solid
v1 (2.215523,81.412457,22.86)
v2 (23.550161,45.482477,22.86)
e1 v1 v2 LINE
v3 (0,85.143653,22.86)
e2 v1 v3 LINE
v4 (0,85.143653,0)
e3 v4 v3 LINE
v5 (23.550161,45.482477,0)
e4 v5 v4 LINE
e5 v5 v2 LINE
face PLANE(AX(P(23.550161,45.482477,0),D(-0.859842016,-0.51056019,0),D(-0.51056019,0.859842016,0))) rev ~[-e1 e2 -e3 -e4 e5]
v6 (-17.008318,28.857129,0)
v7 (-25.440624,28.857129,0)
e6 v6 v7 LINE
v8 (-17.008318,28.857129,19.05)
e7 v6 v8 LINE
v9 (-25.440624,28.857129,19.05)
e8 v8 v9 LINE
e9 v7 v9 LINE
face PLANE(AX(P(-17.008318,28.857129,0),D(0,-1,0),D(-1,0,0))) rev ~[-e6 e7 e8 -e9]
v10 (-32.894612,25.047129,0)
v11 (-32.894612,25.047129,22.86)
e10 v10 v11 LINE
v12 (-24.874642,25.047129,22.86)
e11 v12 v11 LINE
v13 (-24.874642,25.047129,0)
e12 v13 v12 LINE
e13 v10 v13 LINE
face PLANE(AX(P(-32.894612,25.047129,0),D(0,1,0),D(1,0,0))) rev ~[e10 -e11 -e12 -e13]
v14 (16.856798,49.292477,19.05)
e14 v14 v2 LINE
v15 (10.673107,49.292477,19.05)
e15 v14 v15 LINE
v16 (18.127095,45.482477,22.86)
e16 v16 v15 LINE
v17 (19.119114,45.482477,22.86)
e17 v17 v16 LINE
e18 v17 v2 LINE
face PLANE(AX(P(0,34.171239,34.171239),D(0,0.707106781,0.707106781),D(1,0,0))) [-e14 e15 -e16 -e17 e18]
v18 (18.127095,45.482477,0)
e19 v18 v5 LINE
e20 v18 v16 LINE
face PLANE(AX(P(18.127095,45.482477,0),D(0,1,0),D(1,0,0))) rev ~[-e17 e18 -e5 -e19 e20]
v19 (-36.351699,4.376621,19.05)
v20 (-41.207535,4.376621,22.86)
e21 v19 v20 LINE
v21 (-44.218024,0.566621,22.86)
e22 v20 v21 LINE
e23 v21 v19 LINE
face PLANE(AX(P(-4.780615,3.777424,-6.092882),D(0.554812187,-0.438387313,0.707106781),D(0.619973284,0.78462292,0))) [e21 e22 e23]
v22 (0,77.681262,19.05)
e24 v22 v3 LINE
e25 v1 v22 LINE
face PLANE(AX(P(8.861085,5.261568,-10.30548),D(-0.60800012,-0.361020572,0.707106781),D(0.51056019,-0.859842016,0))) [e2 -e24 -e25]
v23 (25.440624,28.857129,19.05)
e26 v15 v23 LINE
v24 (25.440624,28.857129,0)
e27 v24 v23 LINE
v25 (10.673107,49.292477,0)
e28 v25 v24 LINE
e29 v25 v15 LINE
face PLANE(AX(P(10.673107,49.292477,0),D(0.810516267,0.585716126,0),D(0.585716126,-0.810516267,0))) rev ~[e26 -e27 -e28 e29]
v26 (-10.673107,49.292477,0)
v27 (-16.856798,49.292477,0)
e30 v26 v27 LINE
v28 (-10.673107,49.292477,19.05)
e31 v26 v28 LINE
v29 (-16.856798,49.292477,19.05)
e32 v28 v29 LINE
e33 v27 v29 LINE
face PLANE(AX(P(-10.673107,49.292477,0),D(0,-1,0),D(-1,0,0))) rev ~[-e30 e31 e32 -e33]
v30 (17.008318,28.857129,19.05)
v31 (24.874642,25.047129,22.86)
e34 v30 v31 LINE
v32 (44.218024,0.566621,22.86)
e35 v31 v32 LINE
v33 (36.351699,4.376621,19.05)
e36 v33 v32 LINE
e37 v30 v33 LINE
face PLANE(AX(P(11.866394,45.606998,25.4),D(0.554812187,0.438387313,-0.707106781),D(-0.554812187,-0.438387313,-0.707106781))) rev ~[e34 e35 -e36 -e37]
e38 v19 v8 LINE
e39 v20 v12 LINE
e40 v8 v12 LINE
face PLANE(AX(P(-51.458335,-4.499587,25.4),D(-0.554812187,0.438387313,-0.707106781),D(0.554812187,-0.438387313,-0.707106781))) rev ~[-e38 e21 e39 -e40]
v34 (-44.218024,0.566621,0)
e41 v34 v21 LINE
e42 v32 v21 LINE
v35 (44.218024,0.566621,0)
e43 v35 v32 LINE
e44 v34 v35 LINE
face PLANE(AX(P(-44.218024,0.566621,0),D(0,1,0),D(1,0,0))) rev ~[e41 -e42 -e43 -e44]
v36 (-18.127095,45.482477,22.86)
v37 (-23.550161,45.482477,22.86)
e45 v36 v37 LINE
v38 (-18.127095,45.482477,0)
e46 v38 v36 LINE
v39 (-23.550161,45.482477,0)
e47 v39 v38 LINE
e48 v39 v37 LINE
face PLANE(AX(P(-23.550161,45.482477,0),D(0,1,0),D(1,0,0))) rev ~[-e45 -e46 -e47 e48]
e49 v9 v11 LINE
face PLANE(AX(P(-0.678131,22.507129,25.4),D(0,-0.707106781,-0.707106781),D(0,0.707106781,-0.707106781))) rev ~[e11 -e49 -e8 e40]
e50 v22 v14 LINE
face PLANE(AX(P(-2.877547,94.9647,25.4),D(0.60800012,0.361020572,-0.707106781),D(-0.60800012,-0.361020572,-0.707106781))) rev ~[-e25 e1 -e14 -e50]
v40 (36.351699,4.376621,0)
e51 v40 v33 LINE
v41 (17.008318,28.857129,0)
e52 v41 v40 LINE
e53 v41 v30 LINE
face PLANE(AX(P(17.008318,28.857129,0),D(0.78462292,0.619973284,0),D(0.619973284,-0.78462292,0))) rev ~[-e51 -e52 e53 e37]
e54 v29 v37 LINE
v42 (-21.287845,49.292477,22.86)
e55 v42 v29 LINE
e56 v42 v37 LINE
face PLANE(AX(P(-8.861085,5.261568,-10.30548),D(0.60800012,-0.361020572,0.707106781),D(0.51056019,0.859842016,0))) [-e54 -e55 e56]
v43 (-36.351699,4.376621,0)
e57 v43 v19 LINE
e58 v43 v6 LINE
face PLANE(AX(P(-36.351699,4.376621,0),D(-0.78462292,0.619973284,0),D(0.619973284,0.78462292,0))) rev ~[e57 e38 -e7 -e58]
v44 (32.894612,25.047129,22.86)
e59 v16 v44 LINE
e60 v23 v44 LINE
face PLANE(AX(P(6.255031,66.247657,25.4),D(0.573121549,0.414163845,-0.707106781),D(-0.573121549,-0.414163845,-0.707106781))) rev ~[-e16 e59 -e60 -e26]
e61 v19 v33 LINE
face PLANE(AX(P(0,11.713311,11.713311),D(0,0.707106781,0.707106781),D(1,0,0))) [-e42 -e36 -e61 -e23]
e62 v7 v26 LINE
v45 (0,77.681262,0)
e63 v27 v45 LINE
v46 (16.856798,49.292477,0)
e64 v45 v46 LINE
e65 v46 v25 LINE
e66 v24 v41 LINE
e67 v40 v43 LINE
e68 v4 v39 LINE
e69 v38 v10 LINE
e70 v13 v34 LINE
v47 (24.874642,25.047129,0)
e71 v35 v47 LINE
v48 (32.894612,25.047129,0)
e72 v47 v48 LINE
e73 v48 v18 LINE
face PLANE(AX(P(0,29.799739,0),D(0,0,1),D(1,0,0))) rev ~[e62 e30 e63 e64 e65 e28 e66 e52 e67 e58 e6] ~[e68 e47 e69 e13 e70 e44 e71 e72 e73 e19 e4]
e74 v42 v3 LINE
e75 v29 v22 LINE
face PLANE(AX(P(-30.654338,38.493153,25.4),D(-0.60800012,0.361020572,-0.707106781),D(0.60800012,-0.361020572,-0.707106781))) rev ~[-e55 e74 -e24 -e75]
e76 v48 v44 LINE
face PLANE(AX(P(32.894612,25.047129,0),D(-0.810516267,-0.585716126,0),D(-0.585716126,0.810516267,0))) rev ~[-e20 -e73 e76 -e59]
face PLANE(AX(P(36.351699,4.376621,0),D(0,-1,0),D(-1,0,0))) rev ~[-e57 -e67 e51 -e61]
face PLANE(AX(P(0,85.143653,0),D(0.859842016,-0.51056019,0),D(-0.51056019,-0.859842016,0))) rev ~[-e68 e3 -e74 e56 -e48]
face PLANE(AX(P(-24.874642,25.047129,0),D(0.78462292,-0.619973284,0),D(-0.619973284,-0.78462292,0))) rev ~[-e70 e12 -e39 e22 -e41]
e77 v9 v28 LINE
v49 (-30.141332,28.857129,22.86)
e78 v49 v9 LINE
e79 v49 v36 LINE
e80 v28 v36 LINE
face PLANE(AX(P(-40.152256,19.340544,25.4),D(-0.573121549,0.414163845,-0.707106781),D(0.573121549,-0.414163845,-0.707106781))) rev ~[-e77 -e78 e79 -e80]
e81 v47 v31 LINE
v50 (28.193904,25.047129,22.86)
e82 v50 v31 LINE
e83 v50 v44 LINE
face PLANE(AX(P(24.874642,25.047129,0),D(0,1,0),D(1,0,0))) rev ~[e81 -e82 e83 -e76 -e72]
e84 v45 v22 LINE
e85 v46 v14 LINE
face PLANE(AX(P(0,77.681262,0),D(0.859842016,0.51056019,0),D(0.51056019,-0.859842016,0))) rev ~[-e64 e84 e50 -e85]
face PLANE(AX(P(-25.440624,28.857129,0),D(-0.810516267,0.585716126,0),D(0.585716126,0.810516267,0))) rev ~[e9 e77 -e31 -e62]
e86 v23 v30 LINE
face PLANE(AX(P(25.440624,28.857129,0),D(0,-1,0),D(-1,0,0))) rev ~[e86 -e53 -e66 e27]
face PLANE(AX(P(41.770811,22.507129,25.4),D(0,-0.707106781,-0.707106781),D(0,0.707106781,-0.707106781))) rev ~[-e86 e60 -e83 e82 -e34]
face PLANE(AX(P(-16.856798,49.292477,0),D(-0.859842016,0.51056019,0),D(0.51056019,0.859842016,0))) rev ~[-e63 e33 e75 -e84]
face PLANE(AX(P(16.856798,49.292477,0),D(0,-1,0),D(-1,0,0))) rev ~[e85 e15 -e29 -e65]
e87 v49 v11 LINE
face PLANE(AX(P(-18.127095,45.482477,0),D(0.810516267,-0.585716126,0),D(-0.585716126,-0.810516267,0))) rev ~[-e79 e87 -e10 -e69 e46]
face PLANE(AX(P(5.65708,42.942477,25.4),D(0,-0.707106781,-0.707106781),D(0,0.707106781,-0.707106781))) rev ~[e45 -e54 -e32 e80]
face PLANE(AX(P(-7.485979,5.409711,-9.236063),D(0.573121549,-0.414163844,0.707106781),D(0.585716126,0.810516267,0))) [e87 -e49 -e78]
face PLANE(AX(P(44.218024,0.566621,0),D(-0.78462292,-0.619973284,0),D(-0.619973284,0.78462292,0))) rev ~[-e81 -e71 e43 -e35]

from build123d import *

# Parameters (mm, degrees)
F1_DEPTH     = 25.4
F2_T4_DEPTH  = 57.8731292872
F2_T9_DEPTH  = 41.0926802964
F2_T14_DEPTH = 63.860720941
F2_T19_DEPTH = 105.3637727113
F2_T25_DEPTH = 63.860720941
F2_T30_DEPTH = 41.0926802964
F2_T35_DEPTH = 57.8731292872
F2_T40_DEPTH = 38.84406527
F2_T45_DEPTH = 65.6766537471
F2_T51_DEPTH = 65.6766537471
F2_T57_DEPTH = 38.84406527


# Not quite as in the source:
# - a fillet or chamfer that OpenCascade refuses, or shapes differently, is made with other operations: its cross-section is extruded or revolved along the edge and cut away or added


with BuildPart() as f1:
    # F0 (on Top) → F1 (new body)
    with BuildSketch(Plane.XY):
        Polygon((-44.2180235174, 0.5666213692), (0, 0.5666213692), (44.2180235174, 0.5666213692), (24.8746419192, 25.0471287349), (32.8946120205, 25.0471287349), (18.1270946377, 45.4824770849), (23.5501605907, 45.4824770849), (0, 85.1436531389), (-23.5501605907, 45.4824770849), (-18.1270946377, 45.4824770849), (-32.8946120205, 25.0471287349), (-24.8746419192, 25.0471287349), align=None)
        Polygon((36.3516993821, 4.3766213692), (0, 4.3766213692), (-36.3516993821, 4.3766213692), (-17.0083177839, 28.8571287349), (-25.4406241332, 28.8571287349), (-10.6731067504, 49.2924770849), (-16.8567980732, 49.2924770849), (0, 77.6812616757), (16.8567980732, 49.2924770849), (10.6731067504, 49.2924770849), (25.4406241332, 28.8571287349), (17.0083177839, 28.8571287349), align=None, mode=Mode.SUBTRACT)
    extrude(amount=F1_DEPTH)

    # F2: chamfer of 6.35 on 11 edges, made by hand


with BuildPart() as f2_tool2:
    # F2_s3 → F2_t4 (new body)
    with BuildSketch(Plane(origin=(-29.3040400955, 40.5510453716, 0), x_dir=(0, 0, 1), z_dir=(0.585716126, -0.8105162674, 0))):
        Polygon((25.4, -43.8721253629), (19.05, -37.5221253629), (25.4, -37.5221253629), align=None)
    extrude(amount=F2_T4_DEPTH)

    split(bisect_by=Plane(origin=(0, 23.9535643674, 23.9535643674), x_dir=(1, 0, 0), z_dir=(0, 0.7071067812, 0.7071067812)), keep=Keep.TOP)


with BuildPart() as f1_1:
    add(f1.part)

    # F2_t1: cut F2_tool2
    add(f2_tool2.part, mode=Mode.SUBTRACT)


with BuildPart() as f2_tool7:
    # F2_s8 → F2_t9 (new body)
    with BuildSketch(Plane.YZ.offset(41.7708111067)):
        Polygon((22.5071287349, 25.4), (28.8571287349, 19.05), (28.8571287349, 25.4), align=None)
    extrude(amount=-F2_T9_DEPTH)

    split(bisect_by=Plane(origin=(7.4859790504, 5.409710853, -9.2360626814), x_dir=(0.585716126, -0.8105162674, 0), z_dir=(-0.573121549, -0.4141638445, 0.7071067812)), keep=Keep.TOP)


with BuildPart() as f1_2:
    add(f1_1.part)

    # F2_t6: cut F2_tool7
    add(f2_tool7.part, mode=Mode.SUBTRACT)


with BuildPart() as f2_tool12:
    # F2_s13 → F2_t14 (new body)
    with BuildSketch(Plane(origin=(-17.6242588903, 22.3048280047, 0), x_dir=(0, 0, 1), z_dir=(0.6199732843, -0.7846229201, 0))):
        Polygon((25.4, -37.5857648435), (19.05, -31.2357648435), (25.4, -31.2357648435), align=None)
    extrude(amount=F2_T14_DEPTH)

    split(bisect_by=Plane(origin=(0, 11.7133106846, 11.7133106846), x_dir=(1, 0, 0), z_dir=(0, 0.7071067812, 0.7071067812)), keep=Keep.TOP)


with BuildPart() as f1_3:
    add(f1_2.part)

    # F2_t11: cut F2_tool12
    add(f2_tool12.part, mode=Mode.SUBTRACT)


with BuildPart() as f2_tool17:
    # F2_s18 → F2_t19 (new body)
    with BuildSketch(Plane.YZ.offset(-52.6818863557)):
        Polygon((-1.9733786308, 25.4), (4.3766213692, 19.05), (4.3766213692, 25.4), align=None)
    extrude(amount=F2_T19_DEPTH)

    split(bisect_by=Plane(origin=(4.7806151974, 3.7774243261, -6.0928824217), x_dir=(0.6199732843, -0.7846229201, 0), z_dir=(-0.5548121875, -0.4383873135, 0.7071067812)), keep=Keep.TOP)

    split(bisect_by=Plane(origin=(-4.7806151974, 3.7774243261, -6.0928824217), x_dir=(0.6199732843, 0.7846229201, 0), z_dir=(0.5548121875, -0.4383873135, 0.7071067812)), keep=Keep.TOP)


with BuildPart() as f1_4:
    add(f1_3.part)

    # F2_t16: cut F2_tool17
    add(f2_tool17.part, mode=Mode.SUBTRACT)


with BuildPart() as f2_tool23:
    # F2_s24 → F2_t25 (new body)
    with BuildSketch(Plane(origin=(-21.9676820116, -27.8017573382, 0), x_dir=(0, 0, 1), z_dir=(0.6199732843, 0.7846229201, 0))):
        Polygon((25.4, -37.5857648435), (19.05, -31.2357648435), (25.4, -31.2357648435), align=None)
    extrude(amount=F2_T25_DEPTH)

    split(bisect_by=Plane(origin=(0, 11.7133106846, 11.7133106846), x_dir=(1, 0, 0), z_dir=(0, 0.7071067812, 0.7071067812)), keep=Keep.TOP)


with BuildPart() as f1_5:
    add(f1_4.part)

    # F2_t22: cut F2_tool23
    add(f2_tool23.part, mode=Mode.SUBTRACT)


with BuildPart() as f2_tool28:
    # F2_s29 → F2_t30 (new body)
    with BuildSketch(Plane.YZ.offset(-0.6781308103)):
        Polygon((22.5071287349, 25.4), (28.8571287349, 19.05), (28.8571287349, 25.4), align=None)
    extrude(amount=-F2_T30_DEPTH)

    split(bisect_by=Plane(origin=(-7.4859790504, 5.409710853, -9.2360626814), x_dir=(0.585716126, 0.8105162674, 0), z_dir=(0.573121549, -0.4141638445, 0.7071067812)), keep=Keep.TOP)


with BuildPart() as f1_6:
    add(f1_5.part)

    # F2_t27: cut F2_tool28
    add(f2_tool28.part, mode=Mode.SUBTRACT)


with BuildPart() as f2_tool33:
    # F2_s34 → F2_t35 (new body)
    with BuildSketch(Plane(origin=(-4.5931849883, -6.3560673631, 0), x_dir=(0, 0, 1), z_dir=(0.585716126, 0.8105162674, 0))):
        Polygon((25.4, -43.8721253629), (19.05, -37.5221253629), (25.4, -37.5221253629), align=None)
    extrude(amount=F2_T35_DEPTH)

    split(bisect_by=Plane(origin=(0, 23.9535643674, 23.9535643674), x_dir=(1, 0, 0), z_dir=(0, 0.7071067812, 0.7071067812)), keep=Keep.TOP)


with BuildPart() as f1_7:
    add(f1_6.part)

    # F2_t32: cut F2_tool33
    add(f2_tool33.part, mode=Mode.SUBTRACT)


with BuildPart() as f2_tool38:
    # F2_s39 → F2_t40 (new body)
    with BuildSketch(Plane.YZ.offset(5.6570802232)):
        Polygon((42.9424770849, 25.4), (49.2924770849, 19.05), (49.2924770849, 25.4), align=None)
    extrude(amount=-F2_T40_DEPTH)

    split(bisect_by=Plane(origin=(-8.8610845664, 5.2615677423, -10.3054798432), x_dir=(0.5105601896, 0.8598420162, 0), z_dir=(0.6080001204, -0.3610205722, 0.7071067812)), keep=Keep.TOP)


with BuildPart() as f1_8:
    add(f1_7.part)

    # F2_t37: cut F2_tool38
    add(f2_tool38.part, mode=Mode.SUBTRACT)


with BuildPart() as f2_tool43:
    # F2_s44 → F2_t45 (new body)
    with BuildSketch(Plane(origin=(8.9078181115, 15.0017890968, 0), x_dir=(0, 0, 1), z_dir=(0.5105601896, 0.8598420162, 0))):
        Polygon((25.4, -46.0109596864), (19.05, -39.6609596864), (25.4, -39.6609596864), align=None)
    extrude(amount=F2_T45_DEPTH)

    split(bisect_by=Plane(origin=(0, 34.1712385424, 34.1712385424), x_dir=(1, 0, 0), z_dir=(0, 0.7071067812, 0.7071067812)), keep=Keep.TOP)

    split(bisect_by=Plane(origin=(8.8610845664, 5.2615677423, -10.3054798432), x_dir=(0.5105601896, -0.8598420162, 0), z_dir=(-0.6080001204, -0.3610205722, 0.7071067812)), keep=Keep.TOP)


with BuildPart() as f1_9:
    add(f1_8.part)

    # F2_t42: cut F2_tool43
    add(f2_tool43.part, mode=Mode.SUBTRACT)


with BuildPart() as f2_tool49:
    # F2_s50 → F2_t51 (new body)
    with BuildSketch(Plane(origin=(-42.4397028983, 71.4733354725, 0), x_dir=(0, 0, 1), z_dir=(0.5105601896, -0.8598420162, 0))):
        Polygon((25.4, -46.0109596864), (19.05, -39.6609596864), (25.4, -39.6609596864), align=None)
    extrude(amount=F2_T51_DEPTH)

    split(bisect_by=Plane(origin=(-8.8610845664, 5.2615677423, -10.3054798432), x_dir=(0.5105601896, 0.8598420162, 0), z_dir=(0.6080001204, -0.3610205722, 0.7071067812)), keep=Keep.TOP)

    split(bisect_by=Plane(origin=(0, 34.1712385424, 34.1712385424), x_dir=(1, 0, 0), z_dir=(0, 0.7071067812, 0.7071067812)), keep=Keep.TOP)


with BuildPart() as f1_10:
    add(f1_9.part)

    # F2_t48: cut F2_tool49
    add(f2_tool49.part, mode=Mode.SUBTRACT)


with BuildPart() as f2_tool55:
    # F2_s56 → F2_t57 (new body)
    with BuildSketch(Plane.YZ.offset(33.1869850468)):
        Polygon((42.9424770849, 25.4), (49.2924770849, 19.05), (49.2924770849, 25.4), align=None)
    extrude(amount=-F2_T57_DEPTH)

    split(bisect_by=Plane(origin=(8.8610845664, 5.2615677423, -10.3054798432), x_dir=(0.5105601896, -0.8598420162, 0), z_dir=(-0.6080001204, -0.3610205722, 0.7071067812)), keep=Keep.TOP)


with BuildPart() as f1_11:
    add(f1_10.part)

    # F2_t54: cut F2_tool55
    add(f2_tool55.part, mode=Mode.SUBTRACT)


solid = f1_11.part
